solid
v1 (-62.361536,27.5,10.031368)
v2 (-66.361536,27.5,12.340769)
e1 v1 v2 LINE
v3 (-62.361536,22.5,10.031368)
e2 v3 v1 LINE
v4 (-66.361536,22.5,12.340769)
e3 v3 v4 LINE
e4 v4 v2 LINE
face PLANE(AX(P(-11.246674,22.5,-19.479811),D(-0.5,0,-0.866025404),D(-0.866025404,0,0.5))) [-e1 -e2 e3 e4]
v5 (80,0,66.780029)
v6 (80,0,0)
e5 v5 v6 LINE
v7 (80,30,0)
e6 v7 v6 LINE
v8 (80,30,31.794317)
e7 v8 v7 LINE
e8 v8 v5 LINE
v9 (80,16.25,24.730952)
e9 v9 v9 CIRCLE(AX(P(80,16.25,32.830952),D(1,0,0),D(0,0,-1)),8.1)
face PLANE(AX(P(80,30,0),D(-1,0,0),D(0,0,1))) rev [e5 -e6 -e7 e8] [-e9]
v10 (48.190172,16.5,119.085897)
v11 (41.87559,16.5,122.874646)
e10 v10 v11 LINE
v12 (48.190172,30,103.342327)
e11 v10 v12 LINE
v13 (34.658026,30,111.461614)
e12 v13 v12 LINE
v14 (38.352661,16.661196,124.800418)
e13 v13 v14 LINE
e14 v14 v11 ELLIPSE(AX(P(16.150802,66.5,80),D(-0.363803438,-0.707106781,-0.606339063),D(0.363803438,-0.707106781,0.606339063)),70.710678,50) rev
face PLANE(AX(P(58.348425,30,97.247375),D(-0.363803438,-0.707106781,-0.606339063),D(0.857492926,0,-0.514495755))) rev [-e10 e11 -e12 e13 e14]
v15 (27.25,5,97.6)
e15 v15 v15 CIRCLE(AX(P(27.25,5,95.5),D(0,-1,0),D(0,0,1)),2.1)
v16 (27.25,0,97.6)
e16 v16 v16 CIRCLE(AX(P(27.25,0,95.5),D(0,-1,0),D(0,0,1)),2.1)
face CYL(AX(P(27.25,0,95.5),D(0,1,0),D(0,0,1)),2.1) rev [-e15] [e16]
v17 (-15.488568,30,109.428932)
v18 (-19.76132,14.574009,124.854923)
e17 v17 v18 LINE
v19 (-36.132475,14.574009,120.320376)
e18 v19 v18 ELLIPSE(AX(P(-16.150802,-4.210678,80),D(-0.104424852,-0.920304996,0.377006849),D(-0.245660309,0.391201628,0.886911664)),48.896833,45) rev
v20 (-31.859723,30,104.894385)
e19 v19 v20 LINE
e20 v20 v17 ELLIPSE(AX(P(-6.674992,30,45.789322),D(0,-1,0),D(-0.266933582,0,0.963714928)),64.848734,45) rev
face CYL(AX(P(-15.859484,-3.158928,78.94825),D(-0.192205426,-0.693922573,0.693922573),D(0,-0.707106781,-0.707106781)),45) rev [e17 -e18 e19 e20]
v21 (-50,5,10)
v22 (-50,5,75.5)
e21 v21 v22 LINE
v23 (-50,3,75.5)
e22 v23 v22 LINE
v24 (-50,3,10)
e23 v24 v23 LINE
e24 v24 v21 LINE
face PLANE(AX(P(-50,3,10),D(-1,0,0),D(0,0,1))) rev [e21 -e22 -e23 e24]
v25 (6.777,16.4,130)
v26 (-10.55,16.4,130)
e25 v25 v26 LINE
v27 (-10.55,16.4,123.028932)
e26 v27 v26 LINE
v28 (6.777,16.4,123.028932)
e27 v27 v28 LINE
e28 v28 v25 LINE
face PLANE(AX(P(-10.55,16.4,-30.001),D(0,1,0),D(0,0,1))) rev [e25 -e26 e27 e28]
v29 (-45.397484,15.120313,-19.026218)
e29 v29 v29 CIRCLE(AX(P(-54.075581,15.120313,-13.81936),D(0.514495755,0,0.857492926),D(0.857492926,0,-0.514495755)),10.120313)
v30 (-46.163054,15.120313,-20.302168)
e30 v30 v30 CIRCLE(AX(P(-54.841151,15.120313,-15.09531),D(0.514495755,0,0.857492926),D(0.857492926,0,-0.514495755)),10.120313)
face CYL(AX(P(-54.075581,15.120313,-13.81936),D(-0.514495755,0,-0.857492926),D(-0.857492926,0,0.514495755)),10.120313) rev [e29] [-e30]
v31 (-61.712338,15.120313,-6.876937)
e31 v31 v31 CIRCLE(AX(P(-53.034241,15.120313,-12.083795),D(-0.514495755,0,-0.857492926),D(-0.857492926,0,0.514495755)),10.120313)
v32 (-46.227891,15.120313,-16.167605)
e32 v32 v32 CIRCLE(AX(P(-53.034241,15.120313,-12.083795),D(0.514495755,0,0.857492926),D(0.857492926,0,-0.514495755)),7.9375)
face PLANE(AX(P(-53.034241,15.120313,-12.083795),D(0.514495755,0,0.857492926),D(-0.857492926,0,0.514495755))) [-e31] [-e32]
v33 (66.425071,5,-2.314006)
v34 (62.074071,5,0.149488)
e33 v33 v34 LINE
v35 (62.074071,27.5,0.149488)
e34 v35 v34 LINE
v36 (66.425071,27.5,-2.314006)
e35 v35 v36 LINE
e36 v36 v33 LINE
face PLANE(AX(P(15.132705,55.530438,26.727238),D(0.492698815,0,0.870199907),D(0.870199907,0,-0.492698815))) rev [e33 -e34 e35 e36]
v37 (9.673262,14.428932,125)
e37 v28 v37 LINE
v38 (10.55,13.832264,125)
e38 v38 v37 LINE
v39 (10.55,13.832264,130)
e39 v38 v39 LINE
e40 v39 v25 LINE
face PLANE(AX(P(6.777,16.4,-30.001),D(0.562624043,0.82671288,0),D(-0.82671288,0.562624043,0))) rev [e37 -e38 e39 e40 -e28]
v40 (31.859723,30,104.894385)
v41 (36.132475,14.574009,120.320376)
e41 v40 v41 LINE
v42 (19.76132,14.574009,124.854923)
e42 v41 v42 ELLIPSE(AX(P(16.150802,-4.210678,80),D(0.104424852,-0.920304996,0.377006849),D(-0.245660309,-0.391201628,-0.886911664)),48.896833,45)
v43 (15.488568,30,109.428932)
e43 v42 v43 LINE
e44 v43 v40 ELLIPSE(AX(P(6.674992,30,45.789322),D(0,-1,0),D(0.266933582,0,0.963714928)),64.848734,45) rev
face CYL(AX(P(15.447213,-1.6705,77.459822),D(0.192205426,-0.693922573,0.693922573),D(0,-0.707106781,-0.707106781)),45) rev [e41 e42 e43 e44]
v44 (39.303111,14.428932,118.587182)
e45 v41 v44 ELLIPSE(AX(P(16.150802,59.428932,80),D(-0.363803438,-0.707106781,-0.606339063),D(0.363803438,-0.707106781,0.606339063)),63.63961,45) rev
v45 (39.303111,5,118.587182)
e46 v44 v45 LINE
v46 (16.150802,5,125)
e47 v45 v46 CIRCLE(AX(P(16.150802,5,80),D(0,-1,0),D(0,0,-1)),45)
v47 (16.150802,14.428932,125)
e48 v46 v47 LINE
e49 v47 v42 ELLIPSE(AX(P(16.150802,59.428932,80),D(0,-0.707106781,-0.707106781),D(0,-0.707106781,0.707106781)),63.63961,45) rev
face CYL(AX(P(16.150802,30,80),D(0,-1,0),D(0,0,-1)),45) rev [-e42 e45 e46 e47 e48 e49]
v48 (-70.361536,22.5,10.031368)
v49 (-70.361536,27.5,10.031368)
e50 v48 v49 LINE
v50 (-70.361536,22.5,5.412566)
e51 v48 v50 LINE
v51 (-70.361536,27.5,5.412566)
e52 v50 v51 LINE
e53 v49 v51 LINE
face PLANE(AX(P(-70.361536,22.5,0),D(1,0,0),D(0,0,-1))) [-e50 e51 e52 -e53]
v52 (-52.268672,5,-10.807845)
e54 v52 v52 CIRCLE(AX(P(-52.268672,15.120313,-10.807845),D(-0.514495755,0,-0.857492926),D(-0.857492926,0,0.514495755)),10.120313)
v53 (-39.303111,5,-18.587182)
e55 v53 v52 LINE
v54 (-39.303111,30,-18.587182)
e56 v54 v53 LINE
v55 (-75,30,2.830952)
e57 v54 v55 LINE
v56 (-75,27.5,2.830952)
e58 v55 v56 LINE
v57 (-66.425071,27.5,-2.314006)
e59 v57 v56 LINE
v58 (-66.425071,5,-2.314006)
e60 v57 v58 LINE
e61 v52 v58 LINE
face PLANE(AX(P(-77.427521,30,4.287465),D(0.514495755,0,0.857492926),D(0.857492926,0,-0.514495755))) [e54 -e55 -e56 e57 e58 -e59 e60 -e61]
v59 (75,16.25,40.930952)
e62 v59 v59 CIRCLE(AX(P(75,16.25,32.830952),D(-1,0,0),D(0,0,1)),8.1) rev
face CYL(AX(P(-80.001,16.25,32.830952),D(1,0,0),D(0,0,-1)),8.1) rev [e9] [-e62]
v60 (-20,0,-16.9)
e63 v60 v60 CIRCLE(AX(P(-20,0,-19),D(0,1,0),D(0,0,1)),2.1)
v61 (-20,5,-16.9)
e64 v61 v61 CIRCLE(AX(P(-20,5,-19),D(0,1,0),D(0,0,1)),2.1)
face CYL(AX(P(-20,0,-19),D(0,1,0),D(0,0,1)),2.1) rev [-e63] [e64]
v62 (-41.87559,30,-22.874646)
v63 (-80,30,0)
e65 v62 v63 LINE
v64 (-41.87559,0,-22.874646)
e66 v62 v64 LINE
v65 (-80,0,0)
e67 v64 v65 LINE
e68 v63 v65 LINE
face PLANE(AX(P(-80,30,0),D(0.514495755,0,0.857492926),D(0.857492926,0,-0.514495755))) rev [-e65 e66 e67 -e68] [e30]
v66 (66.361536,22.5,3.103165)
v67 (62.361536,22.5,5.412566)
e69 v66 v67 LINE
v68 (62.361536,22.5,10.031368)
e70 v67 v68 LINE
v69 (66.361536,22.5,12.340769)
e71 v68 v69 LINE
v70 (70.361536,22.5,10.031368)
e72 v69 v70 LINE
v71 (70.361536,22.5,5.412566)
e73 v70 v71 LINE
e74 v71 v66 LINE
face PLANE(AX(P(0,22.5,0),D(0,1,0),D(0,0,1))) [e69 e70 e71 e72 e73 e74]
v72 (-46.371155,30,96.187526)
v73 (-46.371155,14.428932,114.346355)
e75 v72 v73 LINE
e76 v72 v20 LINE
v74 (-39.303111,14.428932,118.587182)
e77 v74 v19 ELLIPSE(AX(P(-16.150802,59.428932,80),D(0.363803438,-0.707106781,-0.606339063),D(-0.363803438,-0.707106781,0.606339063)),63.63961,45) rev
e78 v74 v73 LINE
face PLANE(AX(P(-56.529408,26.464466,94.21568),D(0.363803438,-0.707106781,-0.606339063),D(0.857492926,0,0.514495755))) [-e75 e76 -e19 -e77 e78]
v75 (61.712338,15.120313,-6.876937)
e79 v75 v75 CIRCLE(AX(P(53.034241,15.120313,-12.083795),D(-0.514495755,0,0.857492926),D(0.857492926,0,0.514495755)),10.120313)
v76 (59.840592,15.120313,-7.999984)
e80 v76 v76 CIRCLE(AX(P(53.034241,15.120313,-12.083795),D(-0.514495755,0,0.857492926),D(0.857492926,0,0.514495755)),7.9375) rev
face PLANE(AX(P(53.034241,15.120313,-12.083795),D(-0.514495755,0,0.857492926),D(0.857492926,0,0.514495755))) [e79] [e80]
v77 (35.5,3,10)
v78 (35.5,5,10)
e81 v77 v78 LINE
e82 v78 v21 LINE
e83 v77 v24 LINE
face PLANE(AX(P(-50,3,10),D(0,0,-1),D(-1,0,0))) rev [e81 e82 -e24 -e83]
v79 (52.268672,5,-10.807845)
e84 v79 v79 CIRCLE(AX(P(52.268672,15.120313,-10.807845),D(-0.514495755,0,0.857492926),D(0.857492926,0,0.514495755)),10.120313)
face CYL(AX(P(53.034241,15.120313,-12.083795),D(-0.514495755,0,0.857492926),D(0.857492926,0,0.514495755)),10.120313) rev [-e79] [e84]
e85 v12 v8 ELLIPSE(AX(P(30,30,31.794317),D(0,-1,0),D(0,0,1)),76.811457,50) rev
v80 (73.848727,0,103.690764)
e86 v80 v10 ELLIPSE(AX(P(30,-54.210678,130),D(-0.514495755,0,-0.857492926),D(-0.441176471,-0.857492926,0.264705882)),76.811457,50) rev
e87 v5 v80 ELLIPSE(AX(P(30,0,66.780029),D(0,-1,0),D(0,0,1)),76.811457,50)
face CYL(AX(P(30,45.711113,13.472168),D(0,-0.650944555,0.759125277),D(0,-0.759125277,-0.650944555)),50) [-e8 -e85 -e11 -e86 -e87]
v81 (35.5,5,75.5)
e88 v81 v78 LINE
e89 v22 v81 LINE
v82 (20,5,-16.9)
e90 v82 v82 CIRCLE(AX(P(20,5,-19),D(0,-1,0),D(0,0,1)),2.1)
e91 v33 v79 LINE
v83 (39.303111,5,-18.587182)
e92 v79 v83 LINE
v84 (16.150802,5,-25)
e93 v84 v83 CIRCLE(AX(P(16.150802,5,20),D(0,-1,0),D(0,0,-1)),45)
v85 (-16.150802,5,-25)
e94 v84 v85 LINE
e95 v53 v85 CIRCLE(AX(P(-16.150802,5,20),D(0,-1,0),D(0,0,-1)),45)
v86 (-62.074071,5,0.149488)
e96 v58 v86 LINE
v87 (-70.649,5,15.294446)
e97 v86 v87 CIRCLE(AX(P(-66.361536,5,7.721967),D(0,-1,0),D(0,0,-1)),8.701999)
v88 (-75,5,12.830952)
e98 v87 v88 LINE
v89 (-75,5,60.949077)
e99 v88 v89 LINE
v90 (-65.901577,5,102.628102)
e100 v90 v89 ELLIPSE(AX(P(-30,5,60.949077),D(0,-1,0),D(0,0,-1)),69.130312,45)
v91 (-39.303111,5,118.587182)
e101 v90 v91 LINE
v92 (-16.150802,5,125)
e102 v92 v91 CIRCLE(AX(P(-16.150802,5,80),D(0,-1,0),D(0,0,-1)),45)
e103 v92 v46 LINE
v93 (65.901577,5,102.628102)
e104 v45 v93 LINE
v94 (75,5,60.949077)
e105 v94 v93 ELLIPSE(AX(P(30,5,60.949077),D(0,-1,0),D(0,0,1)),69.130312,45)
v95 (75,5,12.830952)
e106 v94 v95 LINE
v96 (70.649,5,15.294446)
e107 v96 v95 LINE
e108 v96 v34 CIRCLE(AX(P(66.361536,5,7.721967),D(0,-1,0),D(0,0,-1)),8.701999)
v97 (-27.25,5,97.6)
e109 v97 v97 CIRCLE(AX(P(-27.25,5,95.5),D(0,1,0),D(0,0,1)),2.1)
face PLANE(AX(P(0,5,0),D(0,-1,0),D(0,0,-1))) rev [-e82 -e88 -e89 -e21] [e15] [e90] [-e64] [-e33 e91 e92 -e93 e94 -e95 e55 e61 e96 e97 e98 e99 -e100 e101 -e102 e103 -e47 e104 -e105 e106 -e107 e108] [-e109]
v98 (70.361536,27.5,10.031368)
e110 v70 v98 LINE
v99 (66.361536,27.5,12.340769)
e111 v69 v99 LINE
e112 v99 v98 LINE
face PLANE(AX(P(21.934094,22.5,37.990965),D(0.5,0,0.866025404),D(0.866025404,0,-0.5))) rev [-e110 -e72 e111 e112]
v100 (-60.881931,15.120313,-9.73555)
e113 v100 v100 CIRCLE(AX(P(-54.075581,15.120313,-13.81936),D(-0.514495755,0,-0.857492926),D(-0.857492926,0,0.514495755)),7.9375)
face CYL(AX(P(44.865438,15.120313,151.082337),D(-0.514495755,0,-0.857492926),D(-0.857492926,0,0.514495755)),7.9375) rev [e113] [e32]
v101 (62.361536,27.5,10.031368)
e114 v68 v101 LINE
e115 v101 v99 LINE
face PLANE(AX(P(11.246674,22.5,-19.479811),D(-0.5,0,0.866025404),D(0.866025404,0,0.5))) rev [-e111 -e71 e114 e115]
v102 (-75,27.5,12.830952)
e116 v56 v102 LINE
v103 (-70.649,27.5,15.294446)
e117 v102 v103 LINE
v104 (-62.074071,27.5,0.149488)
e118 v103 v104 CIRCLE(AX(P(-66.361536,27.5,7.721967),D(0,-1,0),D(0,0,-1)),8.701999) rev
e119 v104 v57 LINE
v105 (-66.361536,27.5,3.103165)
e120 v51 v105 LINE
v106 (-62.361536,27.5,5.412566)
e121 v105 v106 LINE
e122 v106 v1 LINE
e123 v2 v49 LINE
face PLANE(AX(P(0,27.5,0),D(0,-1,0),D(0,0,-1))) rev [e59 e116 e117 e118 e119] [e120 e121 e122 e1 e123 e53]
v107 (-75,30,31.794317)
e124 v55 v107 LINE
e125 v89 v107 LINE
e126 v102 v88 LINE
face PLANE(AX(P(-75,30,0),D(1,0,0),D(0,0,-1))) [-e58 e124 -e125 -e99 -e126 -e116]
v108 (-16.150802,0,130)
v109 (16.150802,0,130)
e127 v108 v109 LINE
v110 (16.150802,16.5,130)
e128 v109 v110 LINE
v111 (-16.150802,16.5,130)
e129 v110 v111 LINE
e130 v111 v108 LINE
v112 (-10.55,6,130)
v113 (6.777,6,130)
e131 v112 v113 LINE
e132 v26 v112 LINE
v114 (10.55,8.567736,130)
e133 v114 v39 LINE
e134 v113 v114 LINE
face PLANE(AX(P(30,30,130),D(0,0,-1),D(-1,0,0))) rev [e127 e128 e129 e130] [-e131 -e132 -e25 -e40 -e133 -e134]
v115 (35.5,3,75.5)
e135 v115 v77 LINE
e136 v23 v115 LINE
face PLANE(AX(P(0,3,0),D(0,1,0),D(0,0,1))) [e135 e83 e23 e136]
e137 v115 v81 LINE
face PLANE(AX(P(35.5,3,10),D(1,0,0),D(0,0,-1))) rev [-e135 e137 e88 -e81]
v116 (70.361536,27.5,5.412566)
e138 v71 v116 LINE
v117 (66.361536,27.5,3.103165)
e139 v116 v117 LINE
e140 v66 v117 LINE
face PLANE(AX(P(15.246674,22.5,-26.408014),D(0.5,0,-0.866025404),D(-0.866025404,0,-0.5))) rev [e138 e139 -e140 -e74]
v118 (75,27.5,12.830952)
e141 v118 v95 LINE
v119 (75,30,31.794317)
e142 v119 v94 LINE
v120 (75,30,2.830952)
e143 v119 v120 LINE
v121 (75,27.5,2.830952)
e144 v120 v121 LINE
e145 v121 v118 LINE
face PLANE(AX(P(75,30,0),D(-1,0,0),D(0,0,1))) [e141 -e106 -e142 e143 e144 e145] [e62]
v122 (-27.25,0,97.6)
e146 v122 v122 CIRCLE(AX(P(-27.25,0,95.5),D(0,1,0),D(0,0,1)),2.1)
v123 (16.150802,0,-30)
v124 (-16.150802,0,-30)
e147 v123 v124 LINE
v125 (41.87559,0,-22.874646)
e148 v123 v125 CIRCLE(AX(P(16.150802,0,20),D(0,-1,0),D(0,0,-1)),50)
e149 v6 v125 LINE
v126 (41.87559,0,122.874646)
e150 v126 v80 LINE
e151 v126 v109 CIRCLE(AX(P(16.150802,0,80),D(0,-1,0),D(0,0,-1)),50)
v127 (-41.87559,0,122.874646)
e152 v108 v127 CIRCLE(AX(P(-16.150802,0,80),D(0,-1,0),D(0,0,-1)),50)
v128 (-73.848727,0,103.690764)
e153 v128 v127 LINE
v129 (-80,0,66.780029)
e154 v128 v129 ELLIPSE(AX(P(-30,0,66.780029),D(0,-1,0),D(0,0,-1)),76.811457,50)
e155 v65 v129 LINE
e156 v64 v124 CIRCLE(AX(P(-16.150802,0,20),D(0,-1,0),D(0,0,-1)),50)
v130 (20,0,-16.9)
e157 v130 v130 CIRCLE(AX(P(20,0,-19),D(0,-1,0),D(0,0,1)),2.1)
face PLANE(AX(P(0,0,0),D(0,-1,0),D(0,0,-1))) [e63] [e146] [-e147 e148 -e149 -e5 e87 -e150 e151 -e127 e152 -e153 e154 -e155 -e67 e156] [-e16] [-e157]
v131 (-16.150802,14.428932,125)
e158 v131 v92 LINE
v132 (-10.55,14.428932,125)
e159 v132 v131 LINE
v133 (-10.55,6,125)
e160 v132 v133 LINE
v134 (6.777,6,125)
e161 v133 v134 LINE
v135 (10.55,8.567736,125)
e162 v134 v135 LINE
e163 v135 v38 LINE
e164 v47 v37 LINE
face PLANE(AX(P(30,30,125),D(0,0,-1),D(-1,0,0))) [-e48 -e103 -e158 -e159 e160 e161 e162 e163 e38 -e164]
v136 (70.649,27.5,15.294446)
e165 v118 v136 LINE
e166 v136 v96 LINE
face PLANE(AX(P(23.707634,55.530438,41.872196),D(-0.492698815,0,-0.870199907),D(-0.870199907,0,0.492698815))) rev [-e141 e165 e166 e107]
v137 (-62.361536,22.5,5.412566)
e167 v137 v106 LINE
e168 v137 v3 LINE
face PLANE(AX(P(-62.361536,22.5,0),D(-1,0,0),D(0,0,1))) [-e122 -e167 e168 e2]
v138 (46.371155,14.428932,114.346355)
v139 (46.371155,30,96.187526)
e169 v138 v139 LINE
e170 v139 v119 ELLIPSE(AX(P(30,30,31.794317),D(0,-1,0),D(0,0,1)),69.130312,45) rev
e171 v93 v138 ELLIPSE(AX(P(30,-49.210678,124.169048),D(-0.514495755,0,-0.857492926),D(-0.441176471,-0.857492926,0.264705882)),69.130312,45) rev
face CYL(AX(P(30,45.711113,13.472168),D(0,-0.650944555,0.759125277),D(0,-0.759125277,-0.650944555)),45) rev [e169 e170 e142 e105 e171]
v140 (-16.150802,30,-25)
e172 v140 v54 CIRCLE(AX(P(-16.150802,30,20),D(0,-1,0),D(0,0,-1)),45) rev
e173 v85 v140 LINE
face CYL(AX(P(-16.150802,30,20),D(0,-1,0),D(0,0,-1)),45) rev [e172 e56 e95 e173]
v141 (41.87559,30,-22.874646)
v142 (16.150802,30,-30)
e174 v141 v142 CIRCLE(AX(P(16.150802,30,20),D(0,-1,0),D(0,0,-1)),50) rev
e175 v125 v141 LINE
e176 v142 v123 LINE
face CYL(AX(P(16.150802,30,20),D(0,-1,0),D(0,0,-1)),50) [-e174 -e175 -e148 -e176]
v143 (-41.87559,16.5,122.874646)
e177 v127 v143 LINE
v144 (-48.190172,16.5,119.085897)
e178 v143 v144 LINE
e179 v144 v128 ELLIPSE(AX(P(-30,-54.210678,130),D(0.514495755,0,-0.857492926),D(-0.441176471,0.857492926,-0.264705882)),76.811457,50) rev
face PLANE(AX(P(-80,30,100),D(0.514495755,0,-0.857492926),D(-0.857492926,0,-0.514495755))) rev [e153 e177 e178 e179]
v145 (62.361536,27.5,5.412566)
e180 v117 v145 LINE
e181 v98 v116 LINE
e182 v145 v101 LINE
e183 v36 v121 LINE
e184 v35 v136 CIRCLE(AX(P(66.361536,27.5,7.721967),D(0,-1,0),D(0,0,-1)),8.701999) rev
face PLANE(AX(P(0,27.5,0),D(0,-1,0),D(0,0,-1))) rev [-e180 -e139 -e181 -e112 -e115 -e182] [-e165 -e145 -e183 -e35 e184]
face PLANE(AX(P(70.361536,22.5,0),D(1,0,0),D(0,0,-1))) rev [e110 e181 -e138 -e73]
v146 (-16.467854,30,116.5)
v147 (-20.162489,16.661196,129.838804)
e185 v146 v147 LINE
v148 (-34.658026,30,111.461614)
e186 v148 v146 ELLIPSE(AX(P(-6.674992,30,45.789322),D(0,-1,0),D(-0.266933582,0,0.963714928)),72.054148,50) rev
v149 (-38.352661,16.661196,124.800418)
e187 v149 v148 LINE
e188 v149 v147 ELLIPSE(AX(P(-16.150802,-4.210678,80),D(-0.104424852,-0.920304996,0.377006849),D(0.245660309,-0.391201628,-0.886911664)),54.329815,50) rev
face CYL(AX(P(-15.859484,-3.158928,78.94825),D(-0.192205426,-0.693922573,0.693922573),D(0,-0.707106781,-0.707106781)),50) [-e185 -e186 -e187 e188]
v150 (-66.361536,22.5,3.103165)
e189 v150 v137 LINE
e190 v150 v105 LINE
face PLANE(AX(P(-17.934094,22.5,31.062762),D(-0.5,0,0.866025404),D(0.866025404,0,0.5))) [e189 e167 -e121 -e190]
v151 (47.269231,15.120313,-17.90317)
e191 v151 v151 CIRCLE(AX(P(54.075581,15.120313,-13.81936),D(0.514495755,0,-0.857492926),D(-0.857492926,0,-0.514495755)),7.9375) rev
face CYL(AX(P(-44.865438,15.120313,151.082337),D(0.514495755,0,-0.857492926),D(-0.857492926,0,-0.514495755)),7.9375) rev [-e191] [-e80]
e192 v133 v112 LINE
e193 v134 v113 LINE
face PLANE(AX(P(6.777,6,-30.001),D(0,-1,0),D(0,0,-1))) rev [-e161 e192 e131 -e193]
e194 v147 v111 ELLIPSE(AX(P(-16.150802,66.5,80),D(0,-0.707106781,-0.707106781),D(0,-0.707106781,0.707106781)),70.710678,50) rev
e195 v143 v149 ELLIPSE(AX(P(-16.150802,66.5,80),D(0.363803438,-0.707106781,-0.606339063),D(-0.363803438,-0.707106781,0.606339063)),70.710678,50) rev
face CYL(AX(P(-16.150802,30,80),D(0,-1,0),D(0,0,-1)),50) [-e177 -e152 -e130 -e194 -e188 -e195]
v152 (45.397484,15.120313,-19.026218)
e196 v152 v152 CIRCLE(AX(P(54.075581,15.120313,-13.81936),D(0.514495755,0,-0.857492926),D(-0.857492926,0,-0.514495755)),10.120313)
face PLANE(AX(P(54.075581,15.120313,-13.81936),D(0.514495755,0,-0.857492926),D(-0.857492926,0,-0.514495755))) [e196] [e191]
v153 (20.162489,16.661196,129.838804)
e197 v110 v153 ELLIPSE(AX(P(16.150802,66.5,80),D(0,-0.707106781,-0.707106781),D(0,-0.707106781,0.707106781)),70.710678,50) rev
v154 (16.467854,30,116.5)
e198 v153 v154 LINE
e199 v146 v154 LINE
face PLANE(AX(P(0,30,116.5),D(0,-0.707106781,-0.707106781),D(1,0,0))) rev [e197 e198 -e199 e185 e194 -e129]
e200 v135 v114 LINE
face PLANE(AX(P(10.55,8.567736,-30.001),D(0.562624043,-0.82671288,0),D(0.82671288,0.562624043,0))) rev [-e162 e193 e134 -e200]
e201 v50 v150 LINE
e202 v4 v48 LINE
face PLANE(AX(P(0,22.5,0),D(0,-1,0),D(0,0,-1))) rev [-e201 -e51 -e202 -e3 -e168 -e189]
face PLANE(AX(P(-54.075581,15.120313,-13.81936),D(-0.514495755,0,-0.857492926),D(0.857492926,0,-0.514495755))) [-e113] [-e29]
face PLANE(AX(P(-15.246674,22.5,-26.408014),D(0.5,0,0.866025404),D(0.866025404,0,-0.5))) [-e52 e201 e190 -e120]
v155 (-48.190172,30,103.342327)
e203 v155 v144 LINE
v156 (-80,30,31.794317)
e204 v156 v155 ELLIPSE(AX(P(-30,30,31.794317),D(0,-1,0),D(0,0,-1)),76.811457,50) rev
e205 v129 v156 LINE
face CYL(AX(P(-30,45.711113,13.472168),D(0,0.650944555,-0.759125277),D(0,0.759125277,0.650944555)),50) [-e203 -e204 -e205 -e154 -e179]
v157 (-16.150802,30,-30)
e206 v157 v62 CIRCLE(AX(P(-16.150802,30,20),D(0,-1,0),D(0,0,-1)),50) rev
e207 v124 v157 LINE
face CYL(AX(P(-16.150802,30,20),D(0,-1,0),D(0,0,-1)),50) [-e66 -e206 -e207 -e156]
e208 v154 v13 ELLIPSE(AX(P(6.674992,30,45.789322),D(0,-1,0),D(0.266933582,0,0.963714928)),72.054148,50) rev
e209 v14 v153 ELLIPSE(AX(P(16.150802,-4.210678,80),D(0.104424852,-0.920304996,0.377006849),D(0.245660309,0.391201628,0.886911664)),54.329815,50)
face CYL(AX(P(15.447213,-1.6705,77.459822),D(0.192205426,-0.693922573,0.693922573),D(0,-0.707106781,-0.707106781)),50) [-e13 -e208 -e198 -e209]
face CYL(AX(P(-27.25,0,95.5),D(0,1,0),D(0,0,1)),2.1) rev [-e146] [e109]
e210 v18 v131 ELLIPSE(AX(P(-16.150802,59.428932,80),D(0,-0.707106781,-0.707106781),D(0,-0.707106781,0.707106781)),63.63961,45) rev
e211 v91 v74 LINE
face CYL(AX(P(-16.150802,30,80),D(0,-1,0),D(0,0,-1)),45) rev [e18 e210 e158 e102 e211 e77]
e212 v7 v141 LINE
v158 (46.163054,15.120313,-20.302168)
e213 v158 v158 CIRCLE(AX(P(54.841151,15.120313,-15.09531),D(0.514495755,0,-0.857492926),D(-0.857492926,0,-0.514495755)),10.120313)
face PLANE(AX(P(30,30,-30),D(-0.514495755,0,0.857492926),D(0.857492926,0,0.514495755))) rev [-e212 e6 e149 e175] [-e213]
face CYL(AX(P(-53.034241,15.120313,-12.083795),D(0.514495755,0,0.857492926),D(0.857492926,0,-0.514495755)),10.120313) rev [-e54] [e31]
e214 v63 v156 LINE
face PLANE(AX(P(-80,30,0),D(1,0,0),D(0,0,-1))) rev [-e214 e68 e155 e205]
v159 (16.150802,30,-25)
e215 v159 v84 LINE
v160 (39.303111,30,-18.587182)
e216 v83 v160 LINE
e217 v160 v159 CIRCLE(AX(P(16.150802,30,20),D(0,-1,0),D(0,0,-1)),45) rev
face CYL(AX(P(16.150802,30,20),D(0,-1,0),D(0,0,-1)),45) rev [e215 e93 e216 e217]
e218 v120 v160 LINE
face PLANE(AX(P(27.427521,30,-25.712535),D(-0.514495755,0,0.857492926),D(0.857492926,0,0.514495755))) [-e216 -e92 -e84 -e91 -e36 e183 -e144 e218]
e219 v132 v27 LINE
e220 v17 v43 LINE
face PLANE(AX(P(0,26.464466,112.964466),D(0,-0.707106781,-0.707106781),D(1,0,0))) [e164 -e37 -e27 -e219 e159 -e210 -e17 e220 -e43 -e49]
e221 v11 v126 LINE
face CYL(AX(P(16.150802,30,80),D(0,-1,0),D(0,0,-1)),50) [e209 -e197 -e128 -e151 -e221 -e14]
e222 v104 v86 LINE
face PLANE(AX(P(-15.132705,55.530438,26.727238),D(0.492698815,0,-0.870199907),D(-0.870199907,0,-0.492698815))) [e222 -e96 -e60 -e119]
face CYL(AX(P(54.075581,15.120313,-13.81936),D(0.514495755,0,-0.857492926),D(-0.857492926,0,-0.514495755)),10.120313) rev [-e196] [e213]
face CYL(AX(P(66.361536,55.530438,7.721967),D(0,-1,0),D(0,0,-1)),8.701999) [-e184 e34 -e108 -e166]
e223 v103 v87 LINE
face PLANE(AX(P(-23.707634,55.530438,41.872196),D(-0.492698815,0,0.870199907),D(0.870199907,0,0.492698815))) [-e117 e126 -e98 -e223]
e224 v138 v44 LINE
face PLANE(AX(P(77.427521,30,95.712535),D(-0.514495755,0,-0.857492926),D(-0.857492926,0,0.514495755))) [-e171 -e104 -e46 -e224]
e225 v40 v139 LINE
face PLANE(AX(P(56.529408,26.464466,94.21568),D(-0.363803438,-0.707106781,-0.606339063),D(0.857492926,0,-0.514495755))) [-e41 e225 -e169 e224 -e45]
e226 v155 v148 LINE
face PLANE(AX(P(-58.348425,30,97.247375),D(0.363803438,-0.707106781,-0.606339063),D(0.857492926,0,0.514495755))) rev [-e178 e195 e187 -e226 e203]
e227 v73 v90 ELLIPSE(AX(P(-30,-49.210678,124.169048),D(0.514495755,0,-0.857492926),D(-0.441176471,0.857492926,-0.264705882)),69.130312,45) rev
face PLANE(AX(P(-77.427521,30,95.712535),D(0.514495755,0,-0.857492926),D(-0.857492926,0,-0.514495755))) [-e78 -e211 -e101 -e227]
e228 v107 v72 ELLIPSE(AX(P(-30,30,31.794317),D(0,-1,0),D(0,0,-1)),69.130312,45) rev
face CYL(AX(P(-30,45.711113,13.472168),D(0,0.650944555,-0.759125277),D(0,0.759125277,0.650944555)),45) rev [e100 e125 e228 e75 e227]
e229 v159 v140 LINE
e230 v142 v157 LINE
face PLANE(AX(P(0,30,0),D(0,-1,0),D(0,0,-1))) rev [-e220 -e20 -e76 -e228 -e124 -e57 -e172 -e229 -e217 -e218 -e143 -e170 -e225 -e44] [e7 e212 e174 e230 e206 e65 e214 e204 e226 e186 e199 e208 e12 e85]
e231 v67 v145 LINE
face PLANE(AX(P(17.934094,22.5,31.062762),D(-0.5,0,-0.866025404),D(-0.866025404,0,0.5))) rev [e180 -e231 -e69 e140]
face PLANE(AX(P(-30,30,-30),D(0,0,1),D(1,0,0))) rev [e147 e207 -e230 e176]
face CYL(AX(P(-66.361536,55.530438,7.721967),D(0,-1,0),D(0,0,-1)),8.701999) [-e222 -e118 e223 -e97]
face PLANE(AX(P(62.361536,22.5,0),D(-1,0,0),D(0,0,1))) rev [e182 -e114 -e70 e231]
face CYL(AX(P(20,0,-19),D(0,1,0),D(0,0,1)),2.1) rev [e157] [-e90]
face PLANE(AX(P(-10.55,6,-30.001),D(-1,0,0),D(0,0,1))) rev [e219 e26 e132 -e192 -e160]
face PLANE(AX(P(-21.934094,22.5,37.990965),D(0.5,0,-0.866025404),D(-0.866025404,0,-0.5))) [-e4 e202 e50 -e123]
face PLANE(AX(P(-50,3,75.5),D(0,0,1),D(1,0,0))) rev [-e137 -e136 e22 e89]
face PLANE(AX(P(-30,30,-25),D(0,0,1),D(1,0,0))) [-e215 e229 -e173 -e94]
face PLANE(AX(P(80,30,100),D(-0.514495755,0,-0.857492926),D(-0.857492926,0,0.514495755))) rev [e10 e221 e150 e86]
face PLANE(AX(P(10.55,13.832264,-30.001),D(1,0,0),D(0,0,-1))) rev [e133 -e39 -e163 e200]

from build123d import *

# Parameters (mm, degrees)
BOSS_EXTRUDE1_DEPTH = 30
CHAMFER1_SIZE       = 13.5
FILLET1_R           = 50
FILLET2_R           = 50
SHELL1_T            = -5
CUT_EXTRUDE1_REACH  = 183.384
SKETCH5_W           = 85.5
SKETCH5_H           = 65.5
CUT_EXTRUDE2_DEPTH  = 2
SKETCH6_R           = 10.1203125
CUT_EXTRUDE3_DEPTH  = 1.488
CUT_EXTRUDE4_START  = -1.488
SKETCH7_R           = 10.1203125
CUT_EXTRUDE4_DEPTH  = 1.488
CUT_EXTRUDE5_REACH  = 198.109
SKETCH8_R           = 7.9375
BOSS_EXTRUDE2_START = -25
BOSS_EXTRUDE2_DEPTH = 22.5
CUT_EXTRUDE6_START  = -2.5
CUT_EXTRUDE6_DEPTH  = 5
SKETCH11_R          = 2.1
CUT_EXTRUDE7_DEPTH  = 155.677082983
CUT_EXTRUDE8_REACH  = 210.327
SKETCH12_R          = 8.1


with BuildPart() as part:
    # Sketch3 → Boss-Extrude1 (new body)
    with BuildSketch(Plane(origin=(0, 0, 0), x_dir=(1, 0, 0), z_dir=(0, 1, 0))):
        Polygon((80, 0), (80, -100), (30, -130), (-30, -130), (-80, -100), (-80, 0), (-30, 30), (30, 30), align=None)
    extrude(amount=BOSS_EXTRUDE1_DEPTH)

    # Chamfer1
    chamfer1_edges = [part.edges().sort_by_distance(p)[0] for p in [
        (-55, 30, 115),
        (0, 30, 130),
        (55, 30, 115),
    ]]
    chamfer(chamfer1_edges, length=CHAMFER1_SIZE)

    # Fillet1
    # the kernel refuses this fillet: 50 mm, written as the material it takes off along each edge
    with BuildSketch(Plane(origin=(30, -34.622995619, 130), x_dir=(0.857492925712544, 0, -0.5144957554275268), z_dir=(0, 1, 0)), Plane(origin=(-30, -34.622995619, 130), x_dir=(1, 0, 0), z_dir=(0, 1, 0))) as fillet1_piece_1:
        with BuildLine():
            CenterArc((FILLET1_R * 0.276983964948, FILLET1_R), FILLET1_R, 239.036243468, 30.963756532)
            Line((-FILLET1_R * 0.237511790479, FILLET1_R * 0.142507074287), (0, 0))
            Line((0, 0), (FILLET1_R * 0.276983964948, 0))
        make_face()
    extrude(amount=85.745991237, mode=Mode.SUBTRACT)
    with BuildSketch(Plane(origin=(-80, -39.074271729, 164.810181009), x_dir=(0, -0.759125277171481, -0.6509445549041194), z_dir=(0, 0.6509445549041194, -0.759125277171481))) as fillet1_piece_2:
        with BuildLine():
            CenterArc((FILLET1_R * 0.682998529574, -FILLET1_R), FILLET1_R, 90, 68.666037253)
            Line((-FILLET1_R * 0.248477212904, -FILLET1_R * 0.636196562446), (0, 0))
            Line((0, 0), (FILLET1_R * 0.682998529574, 0))
        make_face()
    extrude(amount=191.488725913, mode=Mode.SUBTRACT)
    with BuildSketch(Plane(origin=(80, -39.074271729, 164.810181009), x_dir=(0, -0.759125277171481, -0.6509445549041195), z_dir=(0, 0.6509445549041195, -0.759125277171481))) as fillet1_piece_3:
        with BuildLine():
            CenterArc((FILLET1_R * 0.682998529574, FILLET1_R), FILLET1_R, 201.333962747, 68.666037253)
            Line((-FILLET1_R * 0.248477212904, FILLET1_R * 0.636196562446), (0, 0))
            Line((0, 0), (FILLET1_R * 0.682998529574, 0))
        make_face()
    extrude(amount=191.488725913, mode=Mode.SUBTRACT)
    with BuildSketch(Plane(origin=(34.617865704, -0.171960433, 146.671960433), x_dir=(0.9114297192816029, -0.13590975982943138, -0.3883611772478869), z_dir=(-0.19220542560964893, 0.6939225729021263, -0.6939225729021263)), Plane(origin=(-34.617865704, -0.171960433, 146.671960433), x_dir=(0.9813547138350198, -0.13590975982942916, 0.13590975982942954), z_dir=(0.19220542560964907, 0.6939225729021263, -0.6939225729021263))) as fillet1_piece_4:
        with BuildLine():
            CenterArc((FILLET1_R * 0.19220542561, FILLET1_R), FILLET1_R, 248.24024707, 21.75975293)
            Line((-FILLET1_R * 0.178510109177, FILLET1_R * 0.0712535371437), (0, 0))
            Line((0, 0), (FILLET1_R * 0.19220542561, 0))
        make_face()
    extrude(amount=67.505976453, mode=Mode.SUBTRACT)

    # Fillet2
    fillet2_edges = [part.edges().sort_by_distance(p)[0] for p in [
        (30, 15, -30),
        (-30, 15, -30),
    ]]
    fillet(fillet2_edges, radius=FILLET2_R)

    # Shell1
    shell1_openings = [part.faces().sort_by_distance(p)[0] for p in [
        (0, 30, 41.507073617),
    ]]
    offset(amount=SHELL1_T, openings=shell1_openings)

    # Sketch4 → Cut-Extrude1 (cut, up to next)
    with BuildSketch(Plane.XY.offset(130), mode=Mode.PRIVATE) as cut_extrude1_sk1:
        Polygon((10.55, 13.832263561), (10.55, 8.567736439), (6.776999518, 6), (-10.55, 6), (-10.55, 16.4), (6.776999518, 16.4), align=None)
    cut_extrude1_tool1 = extrude(cut_extrude1_sk1.sketch, amount=-CUT_EXTRUDE1_REACH, mode=Mode.PRIVATE) & part.part
    add(cut_extrude1_tool1.solids().sort_by_distance((-0.429196, 11.2, 130))[0], mode=Mode.SUBTRACT)

    # Sketch5 → Cut-Extrude2 (cut)
    with BuildSketch(Plane(origin=(0, 5, 0), x_dir=(1, 0, 0), z_dir=(0, 1, 0))):
        with Locations((-7.25, -42.75)):
            Rectangle(SKETCH5_W, SKETCH5_H)
    extrude(amount=-CUT_EXTRUDE2_DEPTH, mode=Mode.SUBTRACT)

    # Sketch6 → Cut-Extrude3 (cut)
    with BuildSketch(Plane(origin=(21.176470588, 0, -35.294117647), x_dir=(-0.8574929257125442, 0, -0.5144957554275265), z_dir=(0.5144957554275265, 0, -0.8574929257125442))):
        with Locations((-39.259425856, 15.1203125)):
            Circle(SKETCH6_R)
    cut_extrude3 = extrude(amount=-CUT_EXTRUDE3_DEPTH, mode=Mode.SUBTRACT)

    # Sketch7 → Cut-Extrude4 (cut)
    with BuildSketch(Plane(origin=(18.603991811, 0, -31.006653018), x_dir=(0.8574929257125442, 0, 0.5144957554275265), z_dir=(-0.5144957554275265, 0, 0.8574929257125442)).offset(CUT_EXTRUDE4_START)):
        with Locations(Location((39.259425856, 15.1203125, 0), (0, 0, 180))):
            Circle(SKETCH7_R)
    cut_extrude4 = extrude(amount=CUT_EXTRUDE4_DEPTH, mode=Mode.SUBTRACT)

    # Sketch8 → Cut-Extrude5 (cut, up to next)
    with BuildSketch(Plane(origin=(21.176470588, 0, -35.294117647), x_dir=(-0.8574929257125442, 0, -0.5144957554275265), z_dir=(0.5144957554275265, 0, -0.8574929257125442)), mode=Mode.PRIVATE) as cut_extrude5_sk1:
        with Locations((-39.259425856, 15.1203125)):
            Circle(SKETCH8_R)
    cut_extrude5_tool1 = extrude(cut_extrude5_sk1.sketch, amount=-CUT_EXTRUDE5_REACH, mode=Mode.PRIVATE) & part.part
    cut_extrude5 = cut_extrude5_tool1.solids().sort_by_distance((54.841151, 15.120313, -15.09531))[0]
    add(cut_extrude5, mode=Mode.SUBTRACT)

    # Mirror1: Cut-Extrude3, Cut-Extrude4, Cut-Extrude5 across plane
    add(cut_extrude3.mirror(Plane(origin=(0, 0, 0), x_dir=(0, 0, 1), z_dir=(1, 0, 0))), mode=Mode.SUBTRACT)
    add(cut_extrude4.mirror(Plane(origin=(0, 0, 0), x_dir=(0, 0, 1), z_dir=(1, 0, 0))), mode=Mode.SUBTRACT)
    add(cut_extrude5.mirror(Plane(origin=(0, 0, 0), x_dir=(0, 0, 1), z_dir=(1, 0, 0))), mode=Mode.SUBTRACT)

    # Sketch9 → Boss-Extrude2 (add)
    with BuildSketch(Plane(origin=(0, 30, 0), x_dir=(1, 0, 0), z_dir=(0, 1, 0)).offset(BOSS_EXTRUDE2_START)):
        with BuildLine():
            Line((-75, -2.830951895), (-66.425070743, 2.314005659))
            Line((-66.425070743, 2.314005659), (-62.074071209, -0.149488415))
            ThreePointArc((-62.074071209, -0.149488415), (-58.789057061, -12.009431821), (-70.649000466, -15.29444597))
            Line((-70.649000466, -15.29444597), (-75, -12.830951895))
            Line((-75, -12.830951895), (-75, -2.830951895))
        make_face()
    boss_extrude2 = extrude(amount=BOSS_EXTRUDE2_DEPTH)

    # Sketch10 → Cut-Extrude6 (cut)
    with BuildSketch(Plane(origin=(0, 30, 0), x_dir=(1, 0, 0), z_dir=(0, 1, 0)).offset(CUT_EXTRUDE6_START)):
        Polygon((-62.361535838, -5.412566116), (-66.361535838, -3.103165039), (-70.361535838, -5.412566116), (-70.361535838, -10.031368269), (-66.361535838, -12.340769346), (-62.361535838, -10.031368269), align=None)
    cut_extrude6 = extrude(amount=-CUT_EXTRUDE6_DEPTH, mode=Mode.SUBTRACT)

    # Mirror2: Boss-Extrude2, Cut-Extrude6 across plane
    add(boss_extrude2.mirror(Plane(origin=(0, 0, 0), x_dir=(0, 0, 1), z_dir=(1, 0, 0))))
    add(cut_extrude6.mirror(Plane(origin=(0, 0, 0), x_dir=(0, 0, 1), z_dir=(1, 0, 0))), mode=Mode.SUBTRACT)

    # Sketch11 → Cut-Extrude7 (cut, through all)
    with BuildSketch(Plane(origin=(0, 5, 0), x_dir=(1, 0, 0), z_dir=(0, 1, 0))):
        with Locations(Location((-27.25, -95.5, 0), (0, 0, 270))):
            Circle(SKETCH11_R)
        with Locations(Location((-20, 19, 0), (0, 0, 270))):
            Circle(SKETCH11_R)
    cut_extrude7 = extrude(amount=-CUT_EXTRUDE7_DEPTH, mode=Mode.SUBTRACT)

    # Mirror3: Cut-Extrude7 across plane
    add(cut_extrude7.mirror(Plane(origin=(0, 0, 0), x_dir=(0, 0, 1), z_dir=(1, 0, 0))), mode=Mode.SUBTRACT)

    # Sketch12 → Cut-Extrude8 (cut, up to next)
    with BuildSketch(Plane(origin=(80, 0, 0), x_dir=(0, 0, -1), z_dir=(1, 0, 0)), mode=Mode.PRIVATE) as cut_extrude8_sk1:
        with Locations((-32.830951895, 16.25)):
            Circle(SKETCH12_R)
    cut_extrude8_tool1 = extrude(cut_extrude8_sk1.sketch, amount=-CUT_EXTRUDE8_REACH, mode=Mode.PRIVATE) & part.part
    add(cut_extrude8_tool1.solids().sort_by_distance((80, 16.25, 32.830952))[0], mode=Mode.SUBTRACT)


solid = part.part
